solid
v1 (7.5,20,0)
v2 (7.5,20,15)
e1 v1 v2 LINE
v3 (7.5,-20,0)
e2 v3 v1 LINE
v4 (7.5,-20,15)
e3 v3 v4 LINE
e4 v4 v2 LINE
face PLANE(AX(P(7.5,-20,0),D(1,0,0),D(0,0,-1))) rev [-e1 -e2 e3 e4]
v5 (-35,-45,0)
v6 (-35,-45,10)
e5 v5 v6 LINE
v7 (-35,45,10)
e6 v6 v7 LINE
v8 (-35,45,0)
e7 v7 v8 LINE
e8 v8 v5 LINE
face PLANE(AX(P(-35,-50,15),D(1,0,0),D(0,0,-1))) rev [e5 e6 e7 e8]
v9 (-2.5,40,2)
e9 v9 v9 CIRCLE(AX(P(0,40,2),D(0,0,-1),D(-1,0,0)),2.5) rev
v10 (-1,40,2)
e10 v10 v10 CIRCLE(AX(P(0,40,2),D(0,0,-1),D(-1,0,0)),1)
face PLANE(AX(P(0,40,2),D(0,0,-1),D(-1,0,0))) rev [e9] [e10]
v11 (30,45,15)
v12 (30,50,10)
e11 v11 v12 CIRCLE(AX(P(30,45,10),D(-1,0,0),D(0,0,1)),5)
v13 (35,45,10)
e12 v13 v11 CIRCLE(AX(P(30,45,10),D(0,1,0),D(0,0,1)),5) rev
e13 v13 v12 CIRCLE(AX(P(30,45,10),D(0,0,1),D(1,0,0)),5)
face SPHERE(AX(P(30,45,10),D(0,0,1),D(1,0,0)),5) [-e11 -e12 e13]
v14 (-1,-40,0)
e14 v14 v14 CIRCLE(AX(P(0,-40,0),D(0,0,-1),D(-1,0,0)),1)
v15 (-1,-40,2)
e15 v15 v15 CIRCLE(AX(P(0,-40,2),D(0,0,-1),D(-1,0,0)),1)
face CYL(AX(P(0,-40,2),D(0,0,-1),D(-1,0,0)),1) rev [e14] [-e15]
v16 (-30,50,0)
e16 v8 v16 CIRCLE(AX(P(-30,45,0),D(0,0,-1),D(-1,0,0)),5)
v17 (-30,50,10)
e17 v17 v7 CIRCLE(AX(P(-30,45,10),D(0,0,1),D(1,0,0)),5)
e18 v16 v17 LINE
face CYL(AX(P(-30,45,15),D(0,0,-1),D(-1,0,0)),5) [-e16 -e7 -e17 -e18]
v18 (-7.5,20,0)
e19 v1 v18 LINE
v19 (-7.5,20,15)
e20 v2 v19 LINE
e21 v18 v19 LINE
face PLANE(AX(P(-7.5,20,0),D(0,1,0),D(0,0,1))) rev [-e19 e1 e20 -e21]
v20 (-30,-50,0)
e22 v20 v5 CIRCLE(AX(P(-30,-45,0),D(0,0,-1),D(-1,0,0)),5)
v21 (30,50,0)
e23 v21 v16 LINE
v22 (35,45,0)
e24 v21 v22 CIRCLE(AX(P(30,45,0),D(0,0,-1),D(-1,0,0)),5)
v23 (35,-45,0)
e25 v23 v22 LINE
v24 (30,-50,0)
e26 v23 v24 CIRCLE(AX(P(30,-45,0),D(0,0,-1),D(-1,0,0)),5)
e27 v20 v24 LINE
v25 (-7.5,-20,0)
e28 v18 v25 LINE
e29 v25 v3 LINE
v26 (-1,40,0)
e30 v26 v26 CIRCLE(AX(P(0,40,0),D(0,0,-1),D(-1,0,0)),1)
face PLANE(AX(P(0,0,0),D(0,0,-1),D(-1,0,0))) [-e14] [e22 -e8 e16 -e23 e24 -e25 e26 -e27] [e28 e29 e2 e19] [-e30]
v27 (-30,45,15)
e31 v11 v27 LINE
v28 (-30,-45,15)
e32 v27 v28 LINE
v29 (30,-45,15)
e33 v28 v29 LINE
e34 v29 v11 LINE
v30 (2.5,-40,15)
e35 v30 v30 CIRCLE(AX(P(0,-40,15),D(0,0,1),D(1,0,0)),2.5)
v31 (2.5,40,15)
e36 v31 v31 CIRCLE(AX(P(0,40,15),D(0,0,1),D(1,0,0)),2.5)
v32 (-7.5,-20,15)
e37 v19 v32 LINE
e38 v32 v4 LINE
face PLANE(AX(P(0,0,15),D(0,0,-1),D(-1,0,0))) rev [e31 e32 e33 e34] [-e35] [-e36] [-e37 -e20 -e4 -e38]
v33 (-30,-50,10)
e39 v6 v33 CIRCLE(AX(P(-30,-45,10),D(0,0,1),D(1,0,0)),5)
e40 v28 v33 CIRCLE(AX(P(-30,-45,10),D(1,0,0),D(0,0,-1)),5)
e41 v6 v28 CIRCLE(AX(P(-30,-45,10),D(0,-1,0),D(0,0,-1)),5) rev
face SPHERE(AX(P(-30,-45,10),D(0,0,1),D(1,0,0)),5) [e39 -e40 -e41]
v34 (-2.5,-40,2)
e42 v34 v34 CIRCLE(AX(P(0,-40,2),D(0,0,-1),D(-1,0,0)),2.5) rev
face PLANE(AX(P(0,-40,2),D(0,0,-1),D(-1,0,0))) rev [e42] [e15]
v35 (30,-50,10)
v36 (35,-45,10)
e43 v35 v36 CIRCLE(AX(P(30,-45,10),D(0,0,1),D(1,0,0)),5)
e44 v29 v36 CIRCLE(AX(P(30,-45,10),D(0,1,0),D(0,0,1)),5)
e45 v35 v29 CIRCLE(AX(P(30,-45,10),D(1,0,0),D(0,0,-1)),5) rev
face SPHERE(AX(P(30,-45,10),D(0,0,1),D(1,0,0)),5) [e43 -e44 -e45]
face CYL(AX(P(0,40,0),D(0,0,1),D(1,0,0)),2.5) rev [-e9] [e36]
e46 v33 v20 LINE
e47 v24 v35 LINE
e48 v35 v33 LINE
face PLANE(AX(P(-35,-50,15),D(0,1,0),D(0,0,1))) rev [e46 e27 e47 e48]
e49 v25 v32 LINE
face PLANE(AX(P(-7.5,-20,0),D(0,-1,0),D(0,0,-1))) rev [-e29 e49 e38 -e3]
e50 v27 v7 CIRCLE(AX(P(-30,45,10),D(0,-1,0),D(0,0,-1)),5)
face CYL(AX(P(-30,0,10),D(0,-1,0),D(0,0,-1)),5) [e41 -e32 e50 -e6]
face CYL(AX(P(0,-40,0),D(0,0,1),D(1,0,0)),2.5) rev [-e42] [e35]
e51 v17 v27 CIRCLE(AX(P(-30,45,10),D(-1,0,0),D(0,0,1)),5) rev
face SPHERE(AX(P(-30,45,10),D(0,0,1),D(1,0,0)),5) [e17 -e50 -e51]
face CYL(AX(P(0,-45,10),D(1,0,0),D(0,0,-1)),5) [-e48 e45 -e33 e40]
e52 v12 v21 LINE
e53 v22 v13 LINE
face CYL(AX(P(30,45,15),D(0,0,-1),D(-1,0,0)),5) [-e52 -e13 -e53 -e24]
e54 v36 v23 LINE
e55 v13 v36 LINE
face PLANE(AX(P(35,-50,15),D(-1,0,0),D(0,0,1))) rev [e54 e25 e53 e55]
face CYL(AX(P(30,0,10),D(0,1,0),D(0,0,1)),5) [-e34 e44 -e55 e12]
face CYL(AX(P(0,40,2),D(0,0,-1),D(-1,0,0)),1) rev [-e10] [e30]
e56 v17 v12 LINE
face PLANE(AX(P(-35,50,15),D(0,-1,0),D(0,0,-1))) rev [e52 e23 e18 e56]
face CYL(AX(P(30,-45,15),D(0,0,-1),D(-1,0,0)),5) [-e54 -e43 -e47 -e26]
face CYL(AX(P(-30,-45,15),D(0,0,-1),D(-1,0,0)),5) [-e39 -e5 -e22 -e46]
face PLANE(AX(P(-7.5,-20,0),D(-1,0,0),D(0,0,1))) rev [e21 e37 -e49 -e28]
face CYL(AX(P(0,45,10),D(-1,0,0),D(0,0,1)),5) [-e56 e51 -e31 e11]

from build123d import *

# Parameters (mm, degrees)
SKETCH1_W           = 70
SKETCH1_H           = 100
BOSS_EXTRUDE1_DEPTH = 15
SKETCH3_W           = 15
SKETCH3_H           = 40
CUT_EXTRUDE1_DEPTH  = 63.84902545
SKETCH4_R           = 2.5
CUT_EXTRUDE2_DEPTH  = 63.84902545
FILLET1_R           = 5
BOSS_EXTRUDE2_START = -2
SKETCH5_R           = 2.5
SKETCH5_R_2         = 1
BOSS_EXTRUDE2_DEPTH = 2
FILLET2_R           = 5


with BuildPart() as part:
    # Sketch1 → Boss-Extrude1 (new body)
    with BuildSketch(Plane.XY):
        Rectangle(SKETCH1_W, SKETCH1_H)
    extrude(amount=BOSS_EXTRUDE1_DEPTH)

    # Sketch3 → Cut-Extrude1 (cut, through all)
    with BuildSketch(Plane.XY.offset(15)):
        Rectangle(SKETCH3_W, SKETCH3_H)
    extrude(amount=-CUT_EXTRUDE1_DEPTH, mode=Mode.SUBTRACT)

    # Sketch4 → Cut-Extrude2 (cut, through all)
    with BuildSketch(Plane.XY.offset(15)):
        with Locations((0, -40)):
            Circle(SKETCH4_R)
        with Locations((0, 40)):
            Circle(SKETCH4_R)
    extrude(amount=-CUT_EXTRUDE2_DEPTH, mode=Mode.SUBTRACT)

    # Fillet1
    fillet1_edges = [part.edges().sort_by_distance(p)[0] for p in [
        (-35, 0, 15),
        (0, -50, 15),
        (35, 0, 15),
        (0, 50, 15),
    ]]
    fillet(fillet1_edges, radius=FILLET1_R)

    # Sketch5 → Boss-Extrude2 (add)
    # profile 1 of 2: a face of its own
    with BuildSketch(Plane(origin=(0, 0, 0), x_dir=(-1, 0, 0), z_dir=(0, 0, -1)).offset(BOSS_EXTRUDE2_START)):
        with Locations(Location((0, 40, 0), (0, 0, 180))):
            Circle(SKETCH5_R)
        with Locations((0, 40)):
            Circle(SKETCH5_R_2, mode=Mode.SUBTRACT)
    # profile 2 of 2: a face of its own
    with BuildSketch(Plane(origin=(0, 0, 0), x_dir=(-1, 0, 0), z_dir=(0, 0, -1)).offset(BOSS_EXTRUDE2_START)):
        with Locations(Location((0, -40, 0), (0, 0, 180))):
            Circle(SKETCH5_R)
        with Locations((0, -40)):
            Circle(SKETCH5_R_2, mode=Mode.SUBTRACT)
    extrude(amount=BOSS_EXTRUDE2_DEPTH)

    # Fillet2
    # the kernel refuses this fillet: 5 mm, written as the material it takes off along each edge
    with BuildSketch(Plane(origin=(-30, 45, 10), x_dir=(0, 1, 0), z_dir=(-1, 0, 0))) as fillet2_piece_1_section:
        Polygon((0, 0), (FILLET2_R, 0), (FILLET2_R, -FILLET2_R), (0, -FILLET2_R), align=None)
    fillet2_piece_1 = extrude(amount=FILLET2_R, mode=Mode.PRIVATE)
    fillet2_piece_1 = fillet2_piece_1 - Plane(origin=(-30, 45, 10), x_dir=(0, -0.7071067811865475, -0.7071067811865475), z_dir=(-1, 0, 0)) * Sphere(FILLET2_R, mode=Mode.PRIVATE)
    add(fillet2_piece_1, mode=Mode.SUBTRACT)
    with BuildSketch(Plane(origin=(30, 45, 10), x_dir=(0, 1, 0), z_dir=(1, 0, 0))) as fillet2_piece_2_section:
        Polygon((0, 0), (FILLET2_R, 0), (FILLET2_R, FILLET2_R), (0, FILLET2_R), align=None)
    fillet2_piece_2 = extrude(amount=FILLET2_R, mode=Mode.PRIVATE)
    fillet2_piece_2 = fillet2_piece_2 - Plane(origin=(30, 45, 10), x_dir=(0, -0.7071067811865475, -0.7071067811865475), z_dir=(1, 0, 0)) * Sphere(FILLET2_R, mode=Mode.PRIVATE)
    add(fillet2_piece_2, mode=Mode.SUBTRACT)
    with BuildSketch(Plane(origin=(-30, -45, 10), x_dir=(-1, 0, 0), z_dir=(0, -1, 0))) as fillet2_piece_3_section:
        Polygon((0, 0), (FILLET2_R, 0), (FILLET2_R, -FILLET2_R), (0, -FILLET2_R), align=None)
    fillet2_piece_3 = extrude(amount=FILLET2_R, mode=Mode.PRIVATE)
    fillet2_piece_3 = fillet2_piece_3 - Plane(origin=(-30, -45, 10), x_dir=(0.7071067811865475, 0, -0.7071067811865475), z_dir=(0, -1, 0)) * Sphere(FILLET2_R, mode=Mode.PRIVATE)
    add(fillet2_piece_3, mode=Mode.SUBTRACT)
    with BuildSketch(Plane(origin=(30, -45, 10), x_dir=(1, 0, 0), z_dir=(0, -1, 0))) as fillet2_piece_4_section:
        Polygon((0, 0), (FILLET2_R, 0), (FILLET2_R, FILLET2_R), (0, FILLET2_R), align=None)
    fillet2_piece_4 = extrude(amount=FILLET2_R, mode=Mode.PRIVATE)
    fillet2_piece_4 = fillet2_piece_4 - Plane(origin=(30, -45, 10), x_dir=(-0.7071067811865475, 0, -0.7071067811865475), z_dir=(0, -1, 0)) * Sphere(FILLET2_R, mode=Mode.PRIVATE)
    add(fillet2_piece_4, mode=Mode.SUBTRACT)
    with BuildSketch(Plane(origin=(35, -50, -12.5), x_dir=(-1, 0, 0), z_dir=(0, 0, 1)), Plane(origin=(35, 50, -12.5), x_dir=(0, -1, 0), z_dir=(0, 0, 1))) as fillet2_piece_5:
        with BuildLine():
            CenterArc((FILLET2_R, -FILLET2_R), FILLET2_R, 90, 90)
            Line((0, -FILLET2_R), (0, 0))
            Line((0, 0), (FILLET2_R, 0))
        make_face()
    extrude(amount=22.5, mode=Mode.SUBTRACT)
    with BuildSketch(Plane(origin=(-35, -50, -12.5), x_dir=(1, 0, 0), z_dir=(0, 0, 1)), Plane(origin=(-35, 50, -12.5), x_dir=(0, -1, 0), z_dir=(0, 0, 1))) as fillet2_piece_6:
        with BuildLine():
            CenterArc((FILLET2_R, FILLET2_R), FILLET2_R, 180, 90)
            Line((0, FILLET2_R), (0, 0))
            Line((0, 0), (FILLET2_R, 0))
        make_face()
    extrude(amount=22.5, mode=Mode.SUBTRACT)


solid = part.part
